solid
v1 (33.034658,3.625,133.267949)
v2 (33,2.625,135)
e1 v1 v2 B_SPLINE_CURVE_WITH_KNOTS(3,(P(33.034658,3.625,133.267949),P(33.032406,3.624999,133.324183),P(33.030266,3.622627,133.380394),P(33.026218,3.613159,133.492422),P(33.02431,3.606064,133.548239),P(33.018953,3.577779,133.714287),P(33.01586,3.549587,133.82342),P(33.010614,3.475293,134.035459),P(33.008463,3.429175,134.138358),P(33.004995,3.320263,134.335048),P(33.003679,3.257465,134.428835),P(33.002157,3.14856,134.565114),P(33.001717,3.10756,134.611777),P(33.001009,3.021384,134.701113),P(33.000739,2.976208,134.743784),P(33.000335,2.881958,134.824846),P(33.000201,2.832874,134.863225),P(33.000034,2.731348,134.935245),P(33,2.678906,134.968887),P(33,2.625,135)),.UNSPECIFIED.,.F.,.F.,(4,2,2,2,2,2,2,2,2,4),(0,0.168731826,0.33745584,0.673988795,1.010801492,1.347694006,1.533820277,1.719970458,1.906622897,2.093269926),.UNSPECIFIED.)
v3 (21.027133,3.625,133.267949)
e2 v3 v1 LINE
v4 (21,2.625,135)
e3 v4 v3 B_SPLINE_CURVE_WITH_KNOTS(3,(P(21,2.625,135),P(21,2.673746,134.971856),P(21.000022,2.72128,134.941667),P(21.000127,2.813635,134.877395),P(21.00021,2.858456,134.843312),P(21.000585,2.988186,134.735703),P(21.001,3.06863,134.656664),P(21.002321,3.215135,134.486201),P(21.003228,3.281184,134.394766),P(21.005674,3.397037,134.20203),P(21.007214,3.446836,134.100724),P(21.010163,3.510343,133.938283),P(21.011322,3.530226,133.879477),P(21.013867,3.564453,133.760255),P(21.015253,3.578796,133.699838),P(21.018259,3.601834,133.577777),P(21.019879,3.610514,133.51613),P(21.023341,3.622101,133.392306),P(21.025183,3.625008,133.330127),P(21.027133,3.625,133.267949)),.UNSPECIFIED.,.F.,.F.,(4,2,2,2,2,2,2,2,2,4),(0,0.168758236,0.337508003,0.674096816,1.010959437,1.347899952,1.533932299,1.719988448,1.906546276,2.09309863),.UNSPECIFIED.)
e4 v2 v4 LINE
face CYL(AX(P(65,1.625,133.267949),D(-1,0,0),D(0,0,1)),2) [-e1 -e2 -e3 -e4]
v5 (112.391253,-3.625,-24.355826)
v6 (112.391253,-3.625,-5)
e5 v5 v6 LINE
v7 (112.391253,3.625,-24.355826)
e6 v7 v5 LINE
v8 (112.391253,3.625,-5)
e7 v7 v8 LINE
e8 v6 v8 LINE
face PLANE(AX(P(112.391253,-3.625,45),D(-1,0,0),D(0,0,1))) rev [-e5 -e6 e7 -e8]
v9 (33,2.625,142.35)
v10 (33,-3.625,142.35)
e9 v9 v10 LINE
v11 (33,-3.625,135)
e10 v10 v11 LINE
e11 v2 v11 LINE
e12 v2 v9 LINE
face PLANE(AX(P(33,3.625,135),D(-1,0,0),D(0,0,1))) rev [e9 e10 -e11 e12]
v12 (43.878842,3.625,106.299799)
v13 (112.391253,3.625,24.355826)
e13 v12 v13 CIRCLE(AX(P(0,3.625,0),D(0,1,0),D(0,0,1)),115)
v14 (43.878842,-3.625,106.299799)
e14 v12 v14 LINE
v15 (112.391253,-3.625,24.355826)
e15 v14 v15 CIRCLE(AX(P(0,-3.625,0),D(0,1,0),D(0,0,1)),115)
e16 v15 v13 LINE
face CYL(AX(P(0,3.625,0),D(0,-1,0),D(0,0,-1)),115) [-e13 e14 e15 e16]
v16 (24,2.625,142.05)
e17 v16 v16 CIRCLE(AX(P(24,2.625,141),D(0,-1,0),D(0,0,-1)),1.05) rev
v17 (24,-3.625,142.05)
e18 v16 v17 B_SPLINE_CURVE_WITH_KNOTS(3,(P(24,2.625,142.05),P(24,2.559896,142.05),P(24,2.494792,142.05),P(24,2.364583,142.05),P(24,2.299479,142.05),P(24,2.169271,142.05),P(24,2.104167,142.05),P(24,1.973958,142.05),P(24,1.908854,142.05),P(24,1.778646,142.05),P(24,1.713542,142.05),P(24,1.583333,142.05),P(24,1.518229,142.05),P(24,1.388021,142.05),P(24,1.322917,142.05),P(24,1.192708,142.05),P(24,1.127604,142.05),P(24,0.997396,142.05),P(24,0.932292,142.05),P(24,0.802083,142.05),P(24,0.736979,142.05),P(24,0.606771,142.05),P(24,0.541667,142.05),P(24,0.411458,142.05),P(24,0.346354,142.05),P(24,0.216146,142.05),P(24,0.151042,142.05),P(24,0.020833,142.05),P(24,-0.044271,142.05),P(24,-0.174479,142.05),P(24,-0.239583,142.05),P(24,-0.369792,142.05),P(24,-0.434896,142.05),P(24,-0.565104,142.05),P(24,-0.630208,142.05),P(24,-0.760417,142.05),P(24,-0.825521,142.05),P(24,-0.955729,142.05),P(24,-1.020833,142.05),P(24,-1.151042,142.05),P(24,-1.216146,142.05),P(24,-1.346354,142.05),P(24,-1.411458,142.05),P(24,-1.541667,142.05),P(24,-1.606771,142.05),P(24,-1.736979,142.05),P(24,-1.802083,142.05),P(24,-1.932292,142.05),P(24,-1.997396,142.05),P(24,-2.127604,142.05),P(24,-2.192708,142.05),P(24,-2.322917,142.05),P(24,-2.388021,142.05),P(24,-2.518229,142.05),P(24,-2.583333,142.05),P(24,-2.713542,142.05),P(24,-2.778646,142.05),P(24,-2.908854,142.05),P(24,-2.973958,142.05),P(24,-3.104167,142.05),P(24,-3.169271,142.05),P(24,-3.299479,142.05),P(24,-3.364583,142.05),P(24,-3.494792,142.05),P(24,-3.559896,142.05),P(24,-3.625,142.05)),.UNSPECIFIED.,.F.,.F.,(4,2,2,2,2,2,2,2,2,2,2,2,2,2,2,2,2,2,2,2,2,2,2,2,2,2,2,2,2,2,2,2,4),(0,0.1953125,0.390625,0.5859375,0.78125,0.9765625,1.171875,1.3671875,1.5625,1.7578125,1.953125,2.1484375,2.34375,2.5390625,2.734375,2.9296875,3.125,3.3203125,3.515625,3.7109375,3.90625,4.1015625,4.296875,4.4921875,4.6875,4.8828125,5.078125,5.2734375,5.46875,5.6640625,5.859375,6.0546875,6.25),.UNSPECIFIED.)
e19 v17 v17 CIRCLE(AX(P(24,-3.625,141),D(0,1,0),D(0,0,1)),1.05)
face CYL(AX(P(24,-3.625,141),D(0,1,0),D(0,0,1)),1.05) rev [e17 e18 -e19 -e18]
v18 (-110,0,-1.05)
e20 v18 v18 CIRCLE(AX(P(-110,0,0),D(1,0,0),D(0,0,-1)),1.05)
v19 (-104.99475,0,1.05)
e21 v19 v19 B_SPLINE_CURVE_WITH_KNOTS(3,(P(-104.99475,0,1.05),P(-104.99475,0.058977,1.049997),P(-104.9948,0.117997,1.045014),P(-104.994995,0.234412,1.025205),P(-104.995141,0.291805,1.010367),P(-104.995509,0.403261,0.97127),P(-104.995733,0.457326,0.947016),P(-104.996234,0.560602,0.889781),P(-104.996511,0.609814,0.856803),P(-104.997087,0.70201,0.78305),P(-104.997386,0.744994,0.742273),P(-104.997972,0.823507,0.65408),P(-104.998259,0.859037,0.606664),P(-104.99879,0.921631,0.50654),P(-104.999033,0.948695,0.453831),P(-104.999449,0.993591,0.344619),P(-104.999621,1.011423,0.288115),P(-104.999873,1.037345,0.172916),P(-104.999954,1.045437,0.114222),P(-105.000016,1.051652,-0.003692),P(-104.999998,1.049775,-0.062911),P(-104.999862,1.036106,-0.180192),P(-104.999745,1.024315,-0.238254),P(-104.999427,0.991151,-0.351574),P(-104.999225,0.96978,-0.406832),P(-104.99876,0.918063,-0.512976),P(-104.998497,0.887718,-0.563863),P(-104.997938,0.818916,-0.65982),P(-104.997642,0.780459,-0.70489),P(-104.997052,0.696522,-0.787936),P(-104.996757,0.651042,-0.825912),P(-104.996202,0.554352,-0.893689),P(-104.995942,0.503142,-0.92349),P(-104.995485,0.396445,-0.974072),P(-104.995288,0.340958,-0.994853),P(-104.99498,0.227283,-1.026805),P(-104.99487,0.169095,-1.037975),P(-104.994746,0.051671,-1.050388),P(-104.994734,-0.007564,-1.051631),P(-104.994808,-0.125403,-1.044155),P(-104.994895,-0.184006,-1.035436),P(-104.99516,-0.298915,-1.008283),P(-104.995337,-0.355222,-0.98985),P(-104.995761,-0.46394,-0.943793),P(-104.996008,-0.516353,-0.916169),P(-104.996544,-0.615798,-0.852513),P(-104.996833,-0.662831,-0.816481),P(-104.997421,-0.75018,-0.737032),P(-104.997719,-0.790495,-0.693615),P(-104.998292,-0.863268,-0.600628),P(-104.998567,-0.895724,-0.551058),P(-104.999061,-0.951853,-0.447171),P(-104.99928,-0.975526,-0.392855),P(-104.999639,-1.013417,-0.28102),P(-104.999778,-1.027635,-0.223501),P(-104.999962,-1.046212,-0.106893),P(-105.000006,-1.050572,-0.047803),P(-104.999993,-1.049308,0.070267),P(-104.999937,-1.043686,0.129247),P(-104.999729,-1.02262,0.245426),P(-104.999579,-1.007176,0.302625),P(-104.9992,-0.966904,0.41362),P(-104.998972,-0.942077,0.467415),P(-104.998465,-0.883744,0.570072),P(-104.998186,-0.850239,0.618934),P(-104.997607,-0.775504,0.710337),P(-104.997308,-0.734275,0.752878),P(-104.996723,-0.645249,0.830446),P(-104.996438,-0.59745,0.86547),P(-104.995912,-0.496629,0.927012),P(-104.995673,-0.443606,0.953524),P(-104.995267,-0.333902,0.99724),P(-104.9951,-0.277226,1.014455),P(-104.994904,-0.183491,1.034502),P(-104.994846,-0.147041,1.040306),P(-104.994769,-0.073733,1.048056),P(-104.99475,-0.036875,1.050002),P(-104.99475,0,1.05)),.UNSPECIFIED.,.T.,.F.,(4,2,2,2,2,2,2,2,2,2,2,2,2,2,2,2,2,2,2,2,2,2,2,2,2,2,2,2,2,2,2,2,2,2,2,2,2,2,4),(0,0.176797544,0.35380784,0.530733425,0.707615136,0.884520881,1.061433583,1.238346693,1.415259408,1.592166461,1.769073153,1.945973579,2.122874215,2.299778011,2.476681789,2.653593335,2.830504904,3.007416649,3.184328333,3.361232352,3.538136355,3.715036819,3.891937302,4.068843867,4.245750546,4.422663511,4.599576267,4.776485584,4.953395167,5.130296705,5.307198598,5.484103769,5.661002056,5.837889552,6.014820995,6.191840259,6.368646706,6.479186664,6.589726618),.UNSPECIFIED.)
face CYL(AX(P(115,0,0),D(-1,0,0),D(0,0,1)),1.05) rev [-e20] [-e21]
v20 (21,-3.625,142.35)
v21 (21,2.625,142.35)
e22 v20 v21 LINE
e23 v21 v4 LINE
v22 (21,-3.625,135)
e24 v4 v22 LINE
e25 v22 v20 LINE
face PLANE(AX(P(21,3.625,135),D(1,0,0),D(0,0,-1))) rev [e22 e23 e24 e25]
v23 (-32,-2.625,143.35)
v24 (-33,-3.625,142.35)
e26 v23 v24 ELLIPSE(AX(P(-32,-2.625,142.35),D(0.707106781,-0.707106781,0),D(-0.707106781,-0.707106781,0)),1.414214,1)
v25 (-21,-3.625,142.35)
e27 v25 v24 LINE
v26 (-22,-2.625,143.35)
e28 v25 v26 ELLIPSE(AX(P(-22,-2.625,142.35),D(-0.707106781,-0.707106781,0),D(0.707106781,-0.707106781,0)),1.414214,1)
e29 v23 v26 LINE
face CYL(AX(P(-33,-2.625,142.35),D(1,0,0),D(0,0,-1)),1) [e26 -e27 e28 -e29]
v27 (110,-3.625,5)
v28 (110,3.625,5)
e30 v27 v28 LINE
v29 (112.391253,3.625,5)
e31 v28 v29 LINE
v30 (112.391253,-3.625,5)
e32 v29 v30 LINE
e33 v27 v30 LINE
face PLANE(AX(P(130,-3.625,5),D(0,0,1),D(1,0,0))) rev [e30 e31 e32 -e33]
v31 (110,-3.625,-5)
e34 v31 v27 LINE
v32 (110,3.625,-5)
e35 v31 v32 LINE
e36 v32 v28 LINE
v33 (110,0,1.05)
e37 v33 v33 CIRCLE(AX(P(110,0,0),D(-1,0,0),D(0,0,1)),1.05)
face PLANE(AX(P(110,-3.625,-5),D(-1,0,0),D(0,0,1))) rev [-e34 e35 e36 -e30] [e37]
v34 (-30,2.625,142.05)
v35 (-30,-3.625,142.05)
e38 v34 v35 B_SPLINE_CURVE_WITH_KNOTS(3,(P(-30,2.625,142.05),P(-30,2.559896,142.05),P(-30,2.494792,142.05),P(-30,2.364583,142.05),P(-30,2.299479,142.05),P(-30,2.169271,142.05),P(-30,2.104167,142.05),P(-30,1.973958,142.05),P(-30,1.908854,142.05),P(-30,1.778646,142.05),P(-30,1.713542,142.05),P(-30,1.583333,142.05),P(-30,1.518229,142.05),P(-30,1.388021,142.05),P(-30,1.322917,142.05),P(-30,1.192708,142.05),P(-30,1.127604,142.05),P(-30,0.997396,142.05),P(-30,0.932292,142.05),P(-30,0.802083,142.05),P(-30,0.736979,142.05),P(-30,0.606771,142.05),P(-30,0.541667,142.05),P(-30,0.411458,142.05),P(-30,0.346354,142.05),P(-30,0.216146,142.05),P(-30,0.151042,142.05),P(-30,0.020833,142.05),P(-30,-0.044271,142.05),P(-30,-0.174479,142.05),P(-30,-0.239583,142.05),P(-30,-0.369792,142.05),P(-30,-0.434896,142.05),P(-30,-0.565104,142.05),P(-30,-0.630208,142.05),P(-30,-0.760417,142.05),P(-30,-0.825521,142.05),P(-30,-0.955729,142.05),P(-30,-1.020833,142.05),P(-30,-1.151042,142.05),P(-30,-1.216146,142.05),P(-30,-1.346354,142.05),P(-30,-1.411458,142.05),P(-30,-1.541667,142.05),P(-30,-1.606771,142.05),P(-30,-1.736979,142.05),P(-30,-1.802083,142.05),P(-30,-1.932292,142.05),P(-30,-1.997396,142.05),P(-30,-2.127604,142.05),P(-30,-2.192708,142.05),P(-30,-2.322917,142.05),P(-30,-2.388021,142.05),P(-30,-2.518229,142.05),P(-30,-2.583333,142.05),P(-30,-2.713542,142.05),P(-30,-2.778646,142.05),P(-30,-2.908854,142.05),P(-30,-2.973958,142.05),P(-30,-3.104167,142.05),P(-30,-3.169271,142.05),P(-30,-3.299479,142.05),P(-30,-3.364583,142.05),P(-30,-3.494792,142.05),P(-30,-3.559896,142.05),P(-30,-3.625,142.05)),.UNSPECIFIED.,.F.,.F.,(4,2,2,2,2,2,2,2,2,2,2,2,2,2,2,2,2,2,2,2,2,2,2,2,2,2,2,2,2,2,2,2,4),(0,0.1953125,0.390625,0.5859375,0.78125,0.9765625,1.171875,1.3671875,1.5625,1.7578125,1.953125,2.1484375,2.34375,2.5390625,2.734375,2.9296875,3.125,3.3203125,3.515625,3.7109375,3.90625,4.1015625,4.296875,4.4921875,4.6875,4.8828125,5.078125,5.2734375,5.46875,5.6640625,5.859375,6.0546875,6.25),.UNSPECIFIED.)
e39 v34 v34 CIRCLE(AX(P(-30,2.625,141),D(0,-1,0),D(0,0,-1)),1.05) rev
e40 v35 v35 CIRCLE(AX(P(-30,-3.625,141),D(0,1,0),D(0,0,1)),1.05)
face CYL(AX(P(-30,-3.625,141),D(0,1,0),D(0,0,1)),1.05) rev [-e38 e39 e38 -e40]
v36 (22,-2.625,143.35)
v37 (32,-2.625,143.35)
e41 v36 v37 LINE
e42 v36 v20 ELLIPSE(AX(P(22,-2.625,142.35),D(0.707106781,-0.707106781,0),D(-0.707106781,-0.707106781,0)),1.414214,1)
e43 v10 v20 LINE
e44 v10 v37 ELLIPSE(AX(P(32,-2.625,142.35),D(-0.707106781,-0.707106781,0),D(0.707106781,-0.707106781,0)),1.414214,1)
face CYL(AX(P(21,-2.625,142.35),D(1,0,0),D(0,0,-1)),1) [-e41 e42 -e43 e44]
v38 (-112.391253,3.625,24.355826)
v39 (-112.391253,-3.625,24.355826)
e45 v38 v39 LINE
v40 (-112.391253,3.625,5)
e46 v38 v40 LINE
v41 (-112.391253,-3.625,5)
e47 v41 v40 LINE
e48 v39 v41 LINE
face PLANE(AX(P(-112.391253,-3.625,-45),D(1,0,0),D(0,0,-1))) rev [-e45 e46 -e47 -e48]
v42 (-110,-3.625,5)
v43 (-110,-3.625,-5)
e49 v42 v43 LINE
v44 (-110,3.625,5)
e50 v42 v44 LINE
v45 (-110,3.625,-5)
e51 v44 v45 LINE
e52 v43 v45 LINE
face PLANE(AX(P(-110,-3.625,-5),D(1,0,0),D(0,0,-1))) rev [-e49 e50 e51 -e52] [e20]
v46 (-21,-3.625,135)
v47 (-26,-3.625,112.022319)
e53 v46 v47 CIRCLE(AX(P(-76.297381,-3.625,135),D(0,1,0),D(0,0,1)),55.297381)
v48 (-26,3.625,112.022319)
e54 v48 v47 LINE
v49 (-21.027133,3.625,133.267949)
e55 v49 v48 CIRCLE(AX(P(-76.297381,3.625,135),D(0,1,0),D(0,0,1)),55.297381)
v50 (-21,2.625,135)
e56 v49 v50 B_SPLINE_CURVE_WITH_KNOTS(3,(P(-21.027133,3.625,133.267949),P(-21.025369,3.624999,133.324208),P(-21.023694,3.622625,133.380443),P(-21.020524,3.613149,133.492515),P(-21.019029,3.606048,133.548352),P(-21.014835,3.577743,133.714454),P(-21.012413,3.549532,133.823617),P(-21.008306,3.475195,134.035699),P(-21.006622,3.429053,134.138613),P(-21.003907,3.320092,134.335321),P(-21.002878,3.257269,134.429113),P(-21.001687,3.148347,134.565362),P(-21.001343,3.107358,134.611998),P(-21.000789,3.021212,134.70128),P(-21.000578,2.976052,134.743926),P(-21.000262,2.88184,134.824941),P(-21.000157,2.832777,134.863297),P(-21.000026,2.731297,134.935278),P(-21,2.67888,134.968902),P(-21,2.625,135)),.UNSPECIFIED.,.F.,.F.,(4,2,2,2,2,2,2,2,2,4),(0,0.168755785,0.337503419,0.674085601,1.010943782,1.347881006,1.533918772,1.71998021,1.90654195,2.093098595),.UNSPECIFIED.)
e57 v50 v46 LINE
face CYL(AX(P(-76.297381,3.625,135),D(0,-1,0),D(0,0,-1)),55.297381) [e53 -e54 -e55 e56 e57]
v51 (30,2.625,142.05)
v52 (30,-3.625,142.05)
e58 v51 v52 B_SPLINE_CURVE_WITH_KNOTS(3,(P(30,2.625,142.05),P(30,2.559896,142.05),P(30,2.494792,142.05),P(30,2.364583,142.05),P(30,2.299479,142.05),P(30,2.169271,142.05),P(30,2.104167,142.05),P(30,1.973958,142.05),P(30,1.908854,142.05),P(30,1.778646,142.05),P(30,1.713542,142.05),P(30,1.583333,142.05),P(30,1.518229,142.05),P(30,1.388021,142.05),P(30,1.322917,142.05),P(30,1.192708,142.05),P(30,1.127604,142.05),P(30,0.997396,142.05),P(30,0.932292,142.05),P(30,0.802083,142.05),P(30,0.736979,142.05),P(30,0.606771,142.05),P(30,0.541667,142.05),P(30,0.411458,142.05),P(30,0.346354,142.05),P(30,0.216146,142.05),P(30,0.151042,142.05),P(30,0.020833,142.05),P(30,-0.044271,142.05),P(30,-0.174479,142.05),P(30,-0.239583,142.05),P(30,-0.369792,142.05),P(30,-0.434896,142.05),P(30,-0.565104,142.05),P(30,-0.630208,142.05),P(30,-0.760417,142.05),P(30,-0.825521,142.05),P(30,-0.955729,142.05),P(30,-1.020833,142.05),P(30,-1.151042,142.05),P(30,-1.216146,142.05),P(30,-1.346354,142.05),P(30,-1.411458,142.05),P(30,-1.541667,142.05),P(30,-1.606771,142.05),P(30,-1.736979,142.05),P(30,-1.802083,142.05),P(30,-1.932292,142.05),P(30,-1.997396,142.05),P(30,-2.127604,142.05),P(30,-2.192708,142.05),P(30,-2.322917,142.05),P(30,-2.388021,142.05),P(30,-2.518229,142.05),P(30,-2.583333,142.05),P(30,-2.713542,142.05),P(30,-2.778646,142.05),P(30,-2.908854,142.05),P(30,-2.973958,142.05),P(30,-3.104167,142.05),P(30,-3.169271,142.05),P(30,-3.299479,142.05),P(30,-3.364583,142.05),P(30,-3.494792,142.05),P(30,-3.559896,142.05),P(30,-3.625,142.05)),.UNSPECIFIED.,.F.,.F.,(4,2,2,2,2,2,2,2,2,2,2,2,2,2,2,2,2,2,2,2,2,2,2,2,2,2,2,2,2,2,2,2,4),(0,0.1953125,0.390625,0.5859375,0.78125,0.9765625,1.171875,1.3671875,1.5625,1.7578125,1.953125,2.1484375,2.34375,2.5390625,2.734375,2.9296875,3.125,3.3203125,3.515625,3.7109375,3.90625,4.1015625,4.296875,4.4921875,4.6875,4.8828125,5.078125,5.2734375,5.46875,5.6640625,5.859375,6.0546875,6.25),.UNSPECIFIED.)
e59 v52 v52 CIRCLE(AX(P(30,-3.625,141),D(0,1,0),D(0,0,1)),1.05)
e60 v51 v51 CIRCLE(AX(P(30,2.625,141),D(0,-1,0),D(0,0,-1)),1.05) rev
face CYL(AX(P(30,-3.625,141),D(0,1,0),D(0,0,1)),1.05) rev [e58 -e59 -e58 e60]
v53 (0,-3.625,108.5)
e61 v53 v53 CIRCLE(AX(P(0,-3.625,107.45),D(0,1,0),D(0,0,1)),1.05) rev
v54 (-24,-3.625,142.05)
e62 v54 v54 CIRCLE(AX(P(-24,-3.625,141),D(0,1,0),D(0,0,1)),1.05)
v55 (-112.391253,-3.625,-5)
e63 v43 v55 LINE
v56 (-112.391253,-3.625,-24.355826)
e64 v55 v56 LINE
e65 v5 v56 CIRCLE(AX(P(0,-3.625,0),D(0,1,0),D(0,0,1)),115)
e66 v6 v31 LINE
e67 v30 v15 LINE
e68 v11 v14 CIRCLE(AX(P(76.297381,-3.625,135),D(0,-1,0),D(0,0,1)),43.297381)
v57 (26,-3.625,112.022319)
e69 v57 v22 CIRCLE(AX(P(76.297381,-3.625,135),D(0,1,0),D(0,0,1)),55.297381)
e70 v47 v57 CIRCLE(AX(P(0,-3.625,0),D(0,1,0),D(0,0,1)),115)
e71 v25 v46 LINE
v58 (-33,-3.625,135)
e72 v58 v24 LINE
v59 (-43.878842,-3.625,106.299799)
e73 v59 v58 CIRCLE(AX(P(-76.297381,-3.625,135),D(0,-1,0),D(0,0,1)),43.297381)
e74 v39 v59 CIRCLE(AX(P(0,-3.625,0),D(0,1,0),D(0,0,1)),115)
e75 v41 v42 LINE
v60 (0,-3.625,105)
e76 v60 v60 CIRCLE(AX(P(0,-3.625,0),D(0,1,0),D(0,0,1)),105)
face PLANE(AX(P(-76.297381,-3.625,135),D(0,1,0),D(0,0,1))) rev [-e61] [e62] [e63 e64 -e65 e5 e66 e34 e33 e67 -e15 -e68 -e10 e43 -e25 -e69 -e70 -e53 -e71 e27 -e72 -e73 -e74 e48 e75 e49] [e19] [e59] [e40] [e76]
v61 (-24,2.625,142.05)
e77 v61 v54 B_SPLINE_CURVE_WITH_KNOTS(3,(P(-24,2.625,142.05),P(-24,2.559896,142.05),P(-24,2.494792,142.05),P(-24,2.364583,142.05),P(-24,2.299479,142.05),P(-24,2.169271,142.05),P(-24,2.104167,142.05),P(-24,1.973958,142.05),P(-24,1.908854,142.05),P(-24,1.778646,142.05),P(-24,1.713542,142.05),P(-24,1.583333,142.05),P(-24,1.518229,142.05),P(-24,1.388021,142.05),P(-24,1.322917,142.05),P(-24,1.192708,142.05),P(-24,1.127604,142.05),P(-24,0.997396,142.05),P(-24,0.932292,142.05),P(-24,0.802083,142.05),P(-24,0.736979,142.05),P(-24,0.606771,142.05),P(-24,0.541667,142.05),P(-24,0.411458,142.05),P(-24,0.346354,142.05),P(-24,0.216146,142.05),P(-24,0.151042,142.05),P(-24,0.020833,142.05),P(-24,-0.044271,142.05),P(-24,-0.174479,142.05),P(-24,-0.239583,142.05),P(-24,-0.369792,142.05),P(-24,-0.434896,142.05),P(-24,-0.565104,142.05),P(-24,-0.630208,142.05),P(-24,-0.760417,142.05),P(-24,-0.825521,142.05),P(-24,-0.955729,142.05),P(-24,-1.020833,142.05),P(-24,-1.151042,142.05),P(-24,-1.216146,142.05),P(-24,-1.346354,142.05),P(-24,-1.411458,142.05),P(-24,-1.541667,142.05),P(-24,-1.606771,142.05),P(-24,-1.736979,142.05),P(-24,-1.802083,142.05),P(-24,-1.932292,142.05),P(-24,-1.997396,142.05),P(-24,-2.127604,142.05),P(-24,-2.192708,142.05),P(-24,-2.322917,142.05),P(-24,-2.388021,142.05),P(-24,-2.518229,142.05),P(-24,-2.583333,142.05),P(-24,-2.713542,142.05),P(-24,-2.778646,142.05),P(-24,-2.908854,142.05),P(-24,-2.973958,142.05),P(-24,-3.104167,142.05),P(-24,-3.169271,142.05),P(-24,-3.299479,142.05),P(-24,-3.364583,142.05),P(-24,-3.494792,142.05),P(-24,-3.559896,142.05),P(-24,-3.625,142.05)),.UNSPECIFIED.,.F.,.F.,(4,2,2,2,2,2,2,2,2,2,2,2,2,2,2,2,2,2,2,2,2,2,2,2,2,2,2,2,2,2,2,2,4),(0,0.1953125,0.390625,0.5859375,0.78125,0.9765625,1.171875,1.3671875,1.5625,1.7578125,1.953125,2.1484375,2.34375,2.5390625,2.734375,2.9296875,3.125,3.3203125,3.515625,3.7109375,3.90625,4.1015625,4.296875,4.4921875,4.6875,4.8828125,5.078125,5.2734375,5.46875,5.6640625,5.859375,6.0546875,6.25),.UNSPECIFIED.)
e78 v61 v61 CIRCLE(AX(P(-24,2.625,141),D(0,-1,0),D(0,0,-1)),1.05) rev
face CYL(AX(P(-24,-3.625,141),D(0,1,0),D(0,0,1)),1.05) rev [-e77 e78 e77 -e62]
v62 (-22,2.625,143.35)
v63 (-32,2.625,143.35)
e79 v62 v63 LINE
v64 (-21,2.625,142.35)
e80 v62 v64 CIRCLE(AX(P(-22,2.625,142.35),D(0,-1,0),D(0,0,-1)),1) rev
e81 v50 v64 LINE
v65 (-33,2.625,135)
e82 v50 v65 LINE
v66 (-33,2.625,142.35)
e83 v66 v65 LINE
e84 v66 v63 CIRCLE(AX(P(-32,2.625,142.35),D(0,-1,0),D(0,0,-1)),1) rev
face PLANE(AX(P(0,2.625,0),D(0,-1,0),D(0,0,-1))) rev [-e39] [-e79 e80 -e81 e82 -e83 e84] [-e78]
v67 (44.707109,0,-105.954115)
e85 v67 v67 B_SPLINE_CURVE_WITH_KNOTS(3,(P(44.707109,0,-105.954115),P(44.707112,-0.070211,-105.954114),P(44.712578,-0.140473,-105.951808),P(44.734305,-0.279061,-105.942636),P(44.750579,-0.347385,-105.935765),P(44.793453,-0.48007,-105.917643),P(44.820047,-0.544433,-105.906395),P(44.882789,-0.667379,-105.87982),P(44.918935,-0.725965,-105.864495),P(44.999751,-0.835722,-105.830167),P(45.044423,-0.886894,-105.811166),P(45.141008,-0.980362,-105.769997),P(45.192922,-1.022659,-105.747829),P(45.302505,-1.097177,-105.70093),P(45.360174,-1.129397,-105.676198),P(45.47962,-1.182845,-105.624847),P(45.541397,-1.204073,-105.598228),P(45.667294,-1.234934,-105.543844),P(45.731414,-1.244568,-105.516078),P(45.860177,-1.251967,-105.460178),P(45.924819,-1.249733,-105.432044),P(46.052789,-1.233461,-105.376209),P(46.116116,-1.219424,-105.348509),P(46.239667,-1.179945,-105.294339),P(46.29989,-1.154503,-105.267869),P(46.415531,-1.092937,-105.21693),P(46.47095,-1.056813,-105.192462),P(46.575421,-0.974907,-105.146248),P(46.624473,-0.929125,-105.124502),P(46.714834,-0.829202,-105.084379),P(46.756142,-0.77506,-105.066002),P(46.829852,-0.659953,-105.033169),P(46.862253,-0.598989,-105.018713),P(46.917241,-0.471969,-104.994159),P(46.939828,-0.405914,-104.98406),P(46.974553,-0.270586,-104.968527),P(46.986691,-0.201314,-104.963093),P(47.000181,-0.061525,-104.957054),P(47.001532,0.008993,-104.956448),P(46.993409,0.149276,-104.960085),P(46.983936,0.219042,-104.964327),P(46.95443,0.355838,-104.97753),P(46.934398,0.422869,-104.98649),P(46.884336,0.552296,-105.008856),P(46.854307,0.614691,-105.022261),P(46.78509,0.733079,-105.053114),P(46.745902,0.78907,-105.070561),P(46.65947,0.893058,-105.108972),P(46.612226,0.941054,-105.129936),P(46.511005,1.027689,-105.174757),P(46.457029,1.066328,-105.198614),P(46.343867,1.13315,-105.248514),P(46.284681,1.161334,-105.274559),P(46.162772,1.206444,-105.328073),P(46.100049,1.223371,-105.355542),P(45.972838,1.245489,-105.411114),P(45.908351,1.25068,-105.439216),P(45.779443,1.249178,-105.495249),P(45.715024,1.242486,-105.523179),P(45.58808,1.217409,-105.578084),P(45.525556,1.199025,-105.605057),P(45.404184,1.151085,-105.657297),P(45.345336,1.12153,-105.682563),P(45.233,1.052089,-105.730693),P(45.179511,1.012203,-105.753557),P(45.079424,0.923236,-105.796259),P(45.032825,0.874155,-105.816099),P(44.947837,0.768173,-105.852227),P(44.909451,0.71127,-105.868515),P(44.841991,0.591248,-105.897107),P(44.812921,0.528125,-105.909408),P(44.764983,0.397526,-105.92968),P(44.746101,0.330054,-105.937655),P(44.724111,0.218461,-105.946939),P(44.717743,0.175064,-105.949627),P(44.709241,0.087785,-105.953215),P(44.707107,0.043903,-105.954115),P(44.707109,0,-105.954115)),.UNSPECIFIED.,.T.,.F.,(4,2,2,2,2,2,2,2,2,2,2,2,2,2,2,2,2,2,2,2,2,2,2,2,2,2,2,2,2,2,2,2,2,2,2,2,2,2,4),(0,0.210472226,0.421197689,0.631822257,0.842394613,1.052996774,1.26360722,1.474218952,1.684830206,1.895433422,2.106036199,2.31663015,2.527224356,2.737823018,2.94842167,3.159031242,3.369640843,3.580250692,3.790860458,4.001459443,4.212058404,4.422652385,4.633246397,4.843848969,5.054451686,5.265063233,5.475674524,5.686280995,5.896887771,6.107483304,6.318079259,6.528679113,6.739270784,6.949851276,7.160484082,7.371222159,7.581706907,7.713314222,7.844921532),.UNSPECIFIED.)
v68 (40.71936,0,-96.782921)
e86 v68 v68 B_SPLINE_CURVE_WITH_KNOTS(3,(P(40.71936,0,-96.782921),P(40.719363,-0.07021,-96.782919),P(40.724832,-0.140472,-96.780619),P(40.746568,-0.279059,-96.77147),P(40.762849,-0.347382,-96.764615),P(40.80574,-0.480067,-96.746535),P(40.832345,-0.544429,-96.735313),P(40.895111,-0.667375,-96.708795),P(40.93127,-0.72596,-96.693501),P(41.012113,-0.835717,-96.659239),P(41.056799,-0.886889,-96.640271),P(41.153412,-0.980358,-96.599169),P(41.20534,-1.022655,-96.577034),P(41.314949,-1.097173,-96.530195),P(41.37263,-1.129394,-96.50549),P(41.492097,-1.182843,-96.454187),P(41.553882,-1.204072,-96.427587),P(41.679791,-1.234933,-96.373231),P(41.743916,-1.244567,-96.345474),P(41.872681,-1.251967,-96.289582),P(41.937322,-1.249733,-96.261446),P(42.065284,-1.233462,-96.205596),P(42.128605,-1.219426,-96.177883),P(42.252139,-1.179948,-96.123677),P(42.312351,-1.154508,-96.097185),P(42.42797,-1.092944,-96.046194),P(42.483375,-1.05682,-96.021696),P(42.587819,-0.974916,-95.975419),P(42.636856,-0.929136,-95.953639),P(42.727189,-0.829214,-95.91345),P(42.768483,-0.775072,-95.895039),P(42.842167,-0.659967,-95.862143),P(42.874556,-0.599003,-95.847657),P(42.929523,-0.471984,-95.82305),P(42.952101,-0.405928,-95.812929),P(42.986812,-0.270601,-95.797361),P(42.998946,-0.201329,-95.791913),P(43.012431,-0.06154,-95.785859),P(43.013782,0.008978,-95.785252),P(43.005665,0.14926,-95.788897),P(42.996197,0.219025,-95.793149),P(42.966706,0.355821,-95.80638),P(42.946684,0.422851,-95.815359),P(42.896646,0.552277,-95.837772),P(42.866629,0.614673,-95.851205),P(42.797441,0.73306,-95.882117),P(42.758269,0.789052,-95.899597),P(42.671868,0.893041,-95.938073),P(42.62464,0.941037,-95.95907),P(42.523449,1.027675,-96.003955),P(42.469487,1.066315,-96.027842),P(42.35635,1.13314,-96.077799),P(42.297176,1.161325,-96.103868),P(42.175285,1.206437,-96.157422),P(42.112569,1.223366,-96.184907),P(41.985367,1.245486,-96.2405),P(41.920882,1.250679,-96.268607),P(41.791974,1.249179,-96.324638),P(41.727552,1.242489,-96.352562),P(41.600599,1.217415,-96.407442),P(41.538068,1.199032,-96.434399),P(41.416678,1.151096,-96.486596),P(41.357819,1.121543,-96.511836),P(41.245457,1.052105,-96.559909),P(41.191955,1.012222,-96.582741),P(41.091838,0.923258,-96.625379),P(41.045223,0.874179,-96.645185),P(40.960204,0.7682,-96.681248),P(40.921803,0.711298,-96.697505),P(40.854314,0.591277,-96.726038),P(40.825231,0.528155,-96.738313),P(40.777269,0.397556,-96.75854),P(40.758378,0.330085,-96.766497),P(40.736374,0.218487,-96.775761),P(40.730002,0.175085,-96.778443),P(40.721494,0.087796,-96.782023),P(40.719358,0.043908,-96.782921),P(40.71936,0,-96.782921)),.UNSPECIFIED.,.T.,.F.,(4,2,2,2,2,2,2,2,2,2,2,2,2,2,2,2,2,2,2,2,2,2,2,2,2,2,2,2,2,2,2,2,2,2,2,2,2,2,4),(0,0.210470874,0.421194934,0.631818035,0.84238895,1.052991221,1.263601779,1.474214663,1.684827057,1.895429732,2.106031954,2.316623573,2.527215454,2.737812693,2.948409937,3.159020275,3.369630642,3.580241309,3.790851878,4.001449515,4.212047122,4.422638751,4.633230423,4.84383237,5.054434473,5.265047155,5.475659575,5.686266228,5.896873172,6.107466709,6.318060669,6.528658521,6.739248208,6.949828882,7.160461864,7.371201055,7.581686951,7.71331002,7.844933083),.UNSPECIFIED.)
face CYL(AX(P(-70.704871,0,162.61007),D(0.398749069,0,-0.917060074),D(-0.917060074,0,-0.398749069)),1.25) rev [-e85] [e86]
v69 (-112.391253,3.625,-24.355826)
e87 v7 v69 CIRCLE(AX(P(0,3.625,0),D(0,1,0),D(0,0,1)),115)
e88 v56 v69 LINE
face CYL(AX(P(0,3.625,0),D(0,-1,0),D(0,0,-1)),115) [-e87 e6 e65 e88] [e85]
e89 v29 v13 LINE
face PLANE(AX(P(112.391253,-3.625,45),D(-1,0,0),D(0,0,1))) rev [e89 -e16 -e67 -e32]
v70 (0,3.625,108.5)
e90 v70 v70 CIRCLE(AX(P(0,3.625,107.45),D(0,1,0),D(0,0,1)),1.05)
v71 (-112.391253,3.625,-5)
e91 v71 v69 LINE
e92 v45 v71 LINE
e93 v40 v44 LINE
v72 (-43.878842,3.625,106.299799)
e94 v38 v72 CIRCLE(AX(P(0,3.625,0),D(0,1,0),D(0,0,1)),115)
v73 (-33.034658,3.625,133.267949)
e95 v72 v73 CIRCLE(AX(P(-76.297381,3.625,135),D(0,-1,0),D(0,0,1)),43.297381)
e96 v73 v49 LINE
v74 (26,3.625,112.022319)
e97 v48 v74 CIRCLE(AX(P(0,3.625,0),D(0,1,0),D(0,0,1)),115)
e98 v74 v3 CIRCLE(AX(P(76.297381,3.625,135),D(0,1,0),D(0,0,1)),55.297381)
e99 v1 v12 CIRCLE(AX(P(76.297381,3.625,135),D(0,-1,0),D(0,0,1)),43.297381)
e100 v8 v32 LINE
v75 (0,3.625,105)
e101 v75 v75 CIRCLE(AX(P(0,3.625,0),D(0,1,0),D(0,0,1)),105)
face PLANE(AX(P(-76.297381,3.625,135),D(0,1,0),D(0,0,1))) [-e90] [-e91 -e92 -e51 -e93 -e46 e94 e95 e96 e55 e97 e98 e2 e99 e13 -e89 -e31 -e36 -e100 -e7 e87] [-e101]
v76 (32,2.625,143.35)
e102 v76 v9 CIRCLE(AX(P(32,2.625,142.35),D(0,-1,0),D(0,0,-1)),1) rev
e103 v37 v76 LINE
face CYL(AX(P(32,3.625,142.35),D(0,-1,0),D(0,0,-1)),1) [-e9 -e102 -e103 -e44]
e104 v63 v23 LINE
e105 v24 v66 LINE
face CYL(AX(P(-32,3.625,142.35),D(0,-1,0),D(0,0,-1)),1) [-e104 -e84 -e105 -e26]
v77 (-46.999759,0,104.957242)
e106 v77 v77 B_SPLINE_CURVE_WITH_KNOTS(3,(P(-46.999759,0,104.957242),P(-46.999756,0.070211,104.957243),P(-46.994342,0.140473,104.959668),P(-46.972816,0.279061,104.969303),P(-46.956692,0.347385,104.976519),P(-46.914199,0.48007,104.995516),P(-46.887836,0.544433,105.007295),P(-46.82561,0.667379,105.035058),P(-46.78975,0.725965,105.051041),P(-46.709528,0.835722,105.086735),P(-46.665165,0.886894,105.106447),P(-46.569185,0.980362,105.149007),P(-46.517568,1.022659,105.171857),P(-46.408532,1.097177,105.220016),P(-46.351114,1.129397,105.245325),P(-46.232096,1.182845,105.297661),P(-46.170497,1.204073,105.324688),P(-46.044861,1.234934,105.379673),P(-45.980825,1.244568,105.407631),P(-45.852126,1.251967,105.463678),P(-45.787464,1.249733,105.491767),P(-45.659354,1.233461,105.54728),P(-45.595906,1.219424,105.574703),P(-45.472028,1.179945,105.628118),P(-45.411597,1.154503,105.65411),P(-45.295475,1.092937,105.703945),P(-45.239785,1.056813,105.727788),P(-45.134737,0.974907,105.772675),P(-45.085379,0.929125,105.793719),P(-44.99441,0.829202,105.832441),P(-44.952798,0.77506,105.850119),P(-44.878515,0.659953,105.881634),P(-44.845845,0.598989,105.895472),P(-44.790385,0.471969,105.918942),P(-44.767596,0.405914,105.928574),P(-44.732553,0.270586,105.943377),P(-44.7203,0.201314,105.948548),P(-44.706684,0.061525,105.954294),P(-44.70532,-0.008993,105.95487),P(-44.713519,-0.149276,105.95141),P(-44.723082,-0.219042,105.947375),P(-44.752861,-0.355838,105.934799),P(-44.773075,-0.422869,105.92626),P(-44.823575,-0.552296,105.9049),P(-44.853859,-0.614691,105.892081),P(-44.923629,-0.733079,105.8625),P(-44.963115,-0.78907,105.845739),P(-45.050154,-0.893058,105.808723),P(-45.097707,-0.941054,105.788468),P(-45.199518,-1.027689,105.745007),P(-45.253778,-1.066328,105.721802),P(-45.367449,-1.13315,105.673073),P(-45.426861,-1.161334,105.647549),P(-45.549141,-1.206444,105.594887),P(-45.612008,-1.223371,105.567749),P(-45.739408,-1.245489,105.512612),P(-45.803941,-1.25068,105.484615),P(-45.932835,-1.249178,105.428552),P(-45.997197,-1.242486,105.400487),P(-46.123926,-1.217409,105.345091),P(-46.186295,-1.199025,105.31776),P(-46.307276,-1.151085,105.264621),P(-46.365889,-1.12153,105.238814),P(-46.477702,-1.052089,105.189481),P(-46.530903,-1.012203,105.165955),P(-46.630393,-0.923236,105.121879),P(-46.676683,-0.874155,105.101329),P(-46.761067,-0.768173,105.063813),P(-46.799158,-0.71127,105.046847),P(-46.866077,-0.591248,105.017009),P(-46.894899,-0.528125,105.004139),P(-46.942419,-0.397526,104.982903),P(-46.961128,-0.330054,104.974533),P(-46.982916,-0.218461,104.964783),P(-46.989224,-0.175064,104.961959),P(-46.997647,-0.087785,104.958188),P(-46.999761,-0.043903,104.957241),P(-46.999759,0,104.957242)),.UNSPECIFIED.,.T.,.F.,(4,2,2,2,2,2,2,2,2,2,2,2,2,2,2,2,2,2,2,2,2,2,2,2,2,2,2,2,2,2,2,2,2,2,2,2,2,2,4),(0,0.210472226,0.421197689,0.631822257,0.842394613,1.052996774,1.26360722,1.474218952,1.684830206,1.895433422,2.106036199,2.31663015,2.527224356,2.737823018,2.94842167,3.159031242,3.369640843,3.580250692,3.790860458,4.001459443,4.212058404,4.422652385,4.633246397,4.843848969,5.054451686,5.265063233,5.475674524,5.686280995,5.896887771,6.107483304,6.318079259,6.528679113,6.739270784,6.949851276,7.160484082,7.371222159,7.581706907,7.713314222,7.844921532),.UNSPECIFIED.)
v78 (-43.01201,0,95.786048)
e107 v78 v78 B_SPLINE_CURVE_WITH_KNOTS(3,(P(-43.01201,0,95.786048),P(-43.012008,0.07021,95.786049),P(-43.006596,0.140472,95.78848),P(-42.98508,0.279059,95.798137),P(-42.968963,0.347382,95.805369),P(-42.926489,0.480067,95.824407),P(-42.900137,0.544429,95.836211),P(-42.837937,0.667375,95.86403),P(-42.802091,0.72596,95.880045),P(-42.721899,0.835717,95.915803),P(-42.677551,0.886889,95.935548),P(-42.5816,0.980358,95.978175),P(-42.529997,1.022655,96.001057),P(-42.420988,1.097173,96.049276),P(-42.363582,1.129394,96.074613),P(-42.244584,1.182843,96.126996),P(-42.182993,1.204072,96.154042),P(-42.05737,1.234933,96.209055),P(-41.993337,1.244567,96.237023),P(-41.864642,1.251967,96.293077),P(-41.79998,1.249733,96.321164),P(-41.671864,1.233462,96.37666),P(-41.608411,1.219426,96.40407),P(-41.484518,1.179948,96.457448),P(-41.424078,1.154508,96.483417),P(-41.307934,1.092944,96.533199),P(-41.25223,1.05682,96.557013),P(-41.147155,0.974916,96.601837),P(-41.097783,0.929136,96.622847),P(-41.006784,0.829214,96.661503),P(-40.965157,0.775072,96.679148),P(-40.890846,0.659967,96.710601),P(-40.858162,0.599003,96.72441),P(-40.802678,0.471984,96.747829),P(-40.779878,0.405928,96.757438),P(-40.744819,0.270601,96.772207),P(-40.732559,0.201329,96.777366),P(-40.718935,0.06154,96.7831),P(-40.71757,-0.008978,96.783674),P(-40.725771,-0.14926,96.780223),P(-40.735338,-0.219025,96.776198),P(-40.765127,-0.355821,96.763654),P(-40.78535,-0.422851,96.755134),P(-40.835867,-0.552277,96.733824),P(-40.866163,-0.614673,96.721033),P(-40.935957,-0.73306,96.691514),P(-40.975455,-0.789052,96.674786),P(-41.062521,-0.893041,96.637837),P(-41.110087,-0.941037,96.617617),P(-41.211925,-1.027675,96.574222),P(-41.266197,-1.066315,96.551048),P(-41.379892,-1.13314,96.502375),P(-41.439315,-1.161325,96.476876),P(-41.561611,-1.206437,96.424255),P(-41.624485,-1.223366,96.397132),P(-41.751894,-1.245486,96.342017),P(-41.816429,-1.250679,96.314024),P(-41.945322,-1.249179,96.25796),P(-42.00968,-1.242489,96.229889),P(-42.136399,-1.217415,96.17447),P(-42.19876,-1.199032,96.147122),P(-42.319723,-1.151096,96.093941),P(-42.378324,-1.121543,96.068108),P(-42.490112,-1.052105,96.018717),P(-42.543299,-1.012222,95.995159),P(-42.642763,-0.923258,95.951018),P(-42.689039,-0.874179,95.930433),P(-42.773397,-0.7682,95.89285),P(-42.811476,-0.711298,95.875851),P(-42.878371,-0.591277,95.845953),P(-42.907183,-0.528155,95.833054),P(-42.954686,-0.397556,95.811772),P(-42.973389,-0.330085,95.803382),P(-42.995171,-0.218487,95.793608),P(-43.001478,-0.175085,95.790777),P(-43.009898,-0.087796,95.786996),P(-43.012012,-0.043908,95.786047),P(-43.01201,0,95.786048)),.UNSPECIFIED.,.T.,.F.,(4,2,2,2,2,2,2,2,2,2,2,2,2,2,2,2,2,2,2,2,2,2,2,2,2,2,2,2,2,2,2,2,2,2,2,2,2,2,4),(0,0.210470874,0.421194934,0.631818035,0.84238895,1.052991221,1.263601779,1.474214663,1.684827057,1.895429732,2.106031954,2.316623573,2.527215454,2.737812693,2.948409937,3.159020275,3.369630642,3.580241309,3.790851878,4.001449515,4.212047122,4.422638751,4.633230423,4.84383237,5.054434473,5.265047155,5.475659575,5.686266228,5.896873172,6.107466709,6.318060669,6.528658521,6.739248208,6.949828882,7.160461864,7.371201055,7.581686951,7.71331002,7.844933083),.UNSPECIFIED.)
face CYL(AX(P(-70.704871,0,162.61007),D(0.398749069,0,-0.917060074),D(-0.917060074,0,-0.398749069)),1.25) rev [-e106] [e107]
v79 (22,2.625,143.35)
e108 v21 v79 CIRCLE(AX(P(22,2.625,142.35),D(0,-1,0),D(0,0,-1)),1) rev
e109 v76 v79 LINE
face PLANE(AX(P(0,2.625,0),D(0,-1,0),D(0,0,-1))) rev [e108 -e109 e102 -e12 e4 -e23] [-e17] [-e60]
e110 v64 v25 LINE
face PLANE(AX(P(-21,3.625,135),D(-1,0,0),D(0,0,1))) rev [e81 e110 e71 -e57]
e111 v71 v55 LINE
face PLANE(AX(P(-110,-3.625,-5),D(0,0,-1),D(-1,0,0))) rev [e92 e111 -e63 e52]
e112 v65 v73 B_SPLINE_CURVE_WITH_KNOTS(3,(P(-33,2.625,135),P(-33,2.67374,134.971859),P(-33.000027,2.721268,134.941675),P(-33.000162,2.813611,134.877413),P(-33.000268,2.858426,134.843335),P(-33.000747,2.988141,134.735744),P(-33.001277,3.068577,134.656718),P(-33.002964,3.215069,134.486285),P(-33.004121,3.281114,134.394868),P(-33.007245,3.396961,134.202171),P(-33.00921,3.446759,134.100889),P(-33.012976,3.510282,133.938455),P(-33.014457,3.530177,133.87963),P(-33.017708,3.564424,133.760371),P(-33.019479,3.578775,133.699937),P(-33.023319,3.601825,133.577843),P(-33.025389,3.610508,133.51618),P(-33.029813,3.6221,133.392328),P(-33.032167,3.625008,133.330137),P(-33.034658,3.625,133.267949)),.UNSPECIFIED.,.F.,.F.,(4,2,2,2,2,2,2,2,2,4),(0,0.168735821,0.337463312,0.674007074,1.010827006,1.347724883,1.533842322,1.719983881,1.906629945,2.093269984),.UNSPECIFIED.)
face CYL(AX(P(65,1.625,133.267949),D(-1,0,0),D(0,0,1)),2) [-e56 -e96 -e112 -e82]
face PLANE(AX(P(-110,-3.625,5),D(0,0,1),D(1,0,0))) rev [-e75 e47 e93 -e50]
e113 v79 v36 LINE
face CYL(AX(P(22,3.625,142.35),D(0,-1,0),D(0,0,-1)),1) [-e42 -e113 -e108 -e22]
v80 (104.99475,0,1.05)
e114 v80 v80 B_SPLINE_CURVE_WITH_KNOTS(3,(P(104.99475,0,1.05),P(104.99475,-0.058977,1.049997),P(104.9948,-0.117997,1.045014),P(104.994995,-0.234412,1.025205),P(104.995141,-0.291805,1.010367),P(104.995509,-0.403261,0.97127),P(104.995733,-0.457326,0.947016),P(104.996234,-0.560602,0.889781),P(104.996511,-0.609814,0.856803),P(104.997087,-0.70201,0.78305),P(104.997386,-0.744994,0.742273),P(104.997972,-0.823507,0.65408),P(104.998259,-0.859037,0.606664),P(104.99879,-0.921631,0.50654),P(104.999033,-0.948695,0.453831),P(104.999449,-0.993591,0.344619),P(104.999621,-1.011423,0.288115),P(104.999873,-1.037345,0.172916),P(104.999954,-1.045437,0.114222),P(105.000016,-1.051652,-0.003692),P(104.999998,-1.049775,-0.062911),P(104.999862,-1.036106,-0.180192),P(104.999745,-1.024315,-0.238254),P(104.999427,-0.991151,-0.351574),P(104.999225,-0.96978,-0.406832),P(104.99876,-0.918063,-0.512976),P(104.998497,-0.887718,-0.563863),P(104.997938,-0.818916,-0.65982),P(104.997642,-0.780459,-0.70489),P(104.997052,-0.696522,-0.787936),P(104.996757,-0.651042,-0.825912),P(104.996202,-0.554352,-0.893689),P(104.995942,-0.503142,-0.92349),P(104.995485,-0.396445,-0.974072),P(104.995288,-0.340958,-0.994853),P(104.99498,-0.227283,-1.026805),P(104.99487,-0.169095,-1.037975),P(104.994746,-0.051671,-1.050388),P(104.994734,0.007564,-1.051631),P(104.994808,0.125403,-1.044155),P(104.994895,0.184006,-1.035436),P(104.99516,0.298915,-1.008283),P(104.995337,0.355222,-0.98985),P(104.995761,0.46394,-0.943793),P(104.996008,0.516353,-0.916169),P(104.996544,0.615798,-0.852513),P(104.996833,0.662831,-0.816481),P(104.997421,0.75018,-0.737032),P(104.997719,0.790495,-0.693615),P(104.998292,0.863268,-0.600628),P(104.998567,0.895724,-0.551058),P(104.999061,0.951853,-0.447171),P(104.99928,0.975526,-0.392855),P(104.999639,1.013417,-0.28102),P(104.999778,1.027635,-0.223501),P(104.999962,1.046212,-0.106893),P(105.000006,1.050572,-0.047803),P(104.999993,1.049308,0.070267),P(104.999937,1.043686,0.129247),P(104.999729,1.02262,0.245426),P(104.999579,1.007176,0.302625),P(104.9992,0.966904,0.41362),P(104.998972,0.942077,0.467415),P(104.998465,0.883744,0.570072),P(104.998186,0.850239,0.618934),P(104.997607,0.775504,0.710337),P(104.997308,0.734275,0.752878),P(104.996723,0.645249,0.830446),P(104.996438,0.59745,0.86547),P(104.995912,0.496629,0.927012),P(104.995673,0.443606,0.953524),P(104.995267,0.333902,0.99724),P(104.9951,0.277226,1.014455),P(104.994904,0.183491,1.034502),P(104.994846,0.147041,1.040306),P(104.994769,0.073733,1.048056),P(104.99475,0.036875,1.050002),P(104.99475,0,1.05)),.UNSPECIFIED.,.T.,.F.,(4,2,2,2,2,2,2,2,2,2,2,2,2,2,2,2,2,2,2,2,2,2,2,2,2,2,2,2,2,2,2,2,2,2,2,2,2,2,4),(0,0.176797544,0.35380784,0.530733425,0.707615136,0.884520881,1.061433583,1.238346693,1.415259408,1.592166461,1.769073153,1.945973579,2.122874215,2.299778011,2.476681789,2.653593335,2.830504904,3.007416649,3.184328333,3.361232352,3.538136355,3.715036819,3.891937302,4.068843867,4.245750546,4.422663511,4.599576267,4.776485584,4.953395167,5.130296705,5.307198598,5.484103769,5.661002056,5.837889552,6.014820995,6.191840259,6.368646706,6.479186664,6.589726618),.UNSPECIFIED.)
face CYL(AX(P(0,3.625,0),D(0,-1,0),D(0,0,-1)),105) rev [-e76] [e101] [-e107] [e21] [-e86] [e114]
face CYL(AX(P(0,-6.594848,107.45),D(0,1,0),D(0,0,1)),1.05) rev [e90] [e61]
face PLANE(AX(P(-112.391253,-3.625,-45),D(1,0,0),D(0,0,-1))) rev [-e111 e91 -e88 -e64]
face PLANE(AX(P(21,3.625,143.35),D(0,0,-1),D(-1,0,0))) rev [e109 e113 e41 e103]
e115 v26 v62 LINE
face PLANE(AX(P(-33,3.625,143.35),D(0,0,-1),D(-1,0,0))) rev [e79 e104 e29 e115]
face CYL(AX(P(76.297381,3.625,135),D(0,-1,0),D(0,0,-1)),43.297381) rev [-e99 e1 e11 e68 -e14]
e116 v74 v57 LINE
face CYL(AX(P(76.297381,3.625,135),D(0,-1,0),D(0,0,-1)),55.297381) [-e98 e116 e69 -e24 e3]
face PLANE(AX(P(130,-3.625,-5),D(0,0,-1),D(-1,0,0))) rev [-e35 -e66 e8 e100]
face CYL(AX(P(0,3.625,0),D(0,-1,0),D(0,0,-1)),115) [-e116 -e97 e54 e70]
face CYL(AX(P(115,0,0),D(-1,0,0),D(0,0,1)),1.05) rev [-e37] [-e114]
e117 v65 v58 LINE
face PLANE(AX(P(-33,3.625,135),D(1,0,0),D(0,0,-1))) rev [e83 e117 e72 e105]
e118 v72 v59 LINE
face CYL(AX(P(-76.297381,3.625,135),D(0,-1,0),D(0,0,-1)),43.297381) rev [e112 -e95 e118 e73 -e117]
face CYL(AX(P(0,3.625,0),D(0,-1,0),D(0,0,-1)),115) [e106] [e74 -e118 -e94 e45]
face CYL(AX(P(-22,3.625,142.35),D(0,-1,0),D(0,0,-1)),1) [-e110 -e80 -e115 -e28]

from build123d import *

# Parameters (mm, degrees)
SKETCH2_R               = 105
BOSS_EXTRUDE1_DEPTH     = 3.625
CUT_EXTRUDE1_DEPTH      = 184.813392126
CUT_EXTRUDE1_DEPTH_BACK = 184.813392126
SKETCH4_R               = 1.25
SKETCH7_R               = 1.05
CUT_EXTRUDE2_DEPTH      = 184.920594346
CUT_EXTRUDE3_DEPTH      = 184.813392191
CUT_EXTRUDE3_DEPTH_BACK = 184.813392191
SKETCH9_R               = 1.05
CUT_EXTRUDE4_DEPTH      = 184.813392192
CUT_EXTRUDE4_DEPTH_BACK = 184.813392192
SKETCH10_W              = 20
SKETCH10_H              = 10
CUT_EXTRUDE5_DEPTH      = 184.745375857
CUT_EXTRUDE5_DEPTH_BACK = 184.745375857
SKETCH11_W              = 30
SKETCH11_H              = 90
SKETCH12_R              = 1.05
CUT_EXTRUDE6_DEPTH      = 7.25
FILLET1_R               = 1
SKETCH13_W              = 130
SKETCH13_H              = 10
CUT_EXTRUDE7_DEPTH      = 1
FILLET2_R               = 2


with BuildPart() as part:
    # Sketch2 → Boss-Extrude1 (new, symmetric)
    with BuildSketch(Plane(origin=(0, 0, 0), x_dir=(1, 0, 0), z_dir=(0, 1, 0))):
        with BuildLine():
            Line((-33, -135), (-33, -143.35))
            Line((-33, -143.35), (-21, -143.35))
            Line((-21, -143.35), (-21, -135))
            ThreePointArc((-21, -135), (-22.264456843, -123.242302365), (-26, -112.022319205))
            ThreePointArc((-26, -112.022319205), (0, -115), (26, -112.022319205))
            ThreePointArc((26, -112.022319205), (22.264456843, -123.242302365), (21, -135))
            Line((21, -135), (21, -143.35))
            Line((21, -143.35), (33, -143.35))
            Line((33, -143.35), (33, -135))
            ThreePointArc((33, -135), (35.810957179, -119.65357728), (43.878842197, -106.299798718))
            ThreePointArc((43.878842197, -106.299798718), (0, 115), (-43.878842197, -106.299798718))
            ThreePointArc((-43.878842197, -106.299798718), (-35.810957179, -119.65357728), (-33, -135))
        make_face()
        with Locations(Location((0, 0, 0), (0, 0, 90))):
            Circle(SKETCH2_R, mode=Mode.SUBTRACT)
    extrude(amount=BOSS_EXTRUDE1_DEPTH, both=True)

    # Sketch4 → Cut-Extrude1 (cut, two sides: drawn at the far end of the back side and taken through both)
    with BuildSketch(Plane(origin=(0, 0, 0), x_dir=(0, 1, 0), z_dir=(0.39874906892524387, 0, -0.9170600743851252)).offset(-CUT_EXTRUDE1_DEPTH_BACK)):
        with Locations(Location((0, 0, 0), (0, 0, 270))):
            Circle(SKETCH4_R)
    extrude(amount=CUT_EXTRUDE1_DEPTH + CUT_EXTRUDE1_DEPTH_BACK, mode=Mode.SUBTRACT)

    # Sketch7 → Cut-Extrude2 (cut, through all)
    with BuildSketch(Plane(origin=(0, 3.625, 0), x_dir=(1, 0, 0), z_dir=(0, 1, 0))):
        with Locations(Location((-30, -141, 0), (0, 0, 270))):
            Circle(SKETCH7_R)
        with Locations(Location((-24, -141, 0), (0, 0, 270))):
            Circle(SKETCH7_R)
        with Locations(Location((24, -141, 0), (0, 0, 270))):
            Circle(SKETCH7_R)
        with Locations(Location((30, -141, 0), (0, 0, 270))):
            Circle(SKETCH7_R)
    extrude(amount=-CUT_EXTRUDE2_DEPTH, mode=Mode.SUBTRACT)

    # Sketch9 → Cut-Extrude3 (cut, two sides: drawn at the far end of the back side and taken through both)
    with BuildSketch(Plane(origin=(0, 0, 0), x_dir=(0, 0, -1), z_dir=(1, 0, 0)).offset(-CUT_EXTRUDE3_DEPTH_BACK)):
        with Locations(Location((0, 0, 0), (0, 0, 180))):
            Circle(SKETCH9_R)
    extrude(amount=CUT_EXTRUDE3_DEPTH + CUT_EXTRUDE3_DEPTH_BACK, mode=Mode.SUBTRACT)

    # Sketch10 → Cut-Extrude4 (cut, two sides: drawn at the far end of the back side and taken through both)
    with BuildSketch(Plane(origin=(0, 0, 0), x_dir=(1, 0, 0), z_dir=(0, 1, 0)).offset(-CUT_EXTRUDE4_DEPTH_BACK)):
        with Locations((-120, 0)):
            Rectangle(SKETCH10_W, SKETCH10_H)
        with Locations((120, 0)):
            Rectangle(SKETCH10_W, SKETCH10_H)
    extrude(amount=CUT_EXTRUDE4_DEPTH + CUT_EXTRUDE4_DEPTH_BACK, mode=Mode.SUBTRACT)

    # Sketch11 → Cut-Extrude5 (cut, two sides: drawn at the far end of the back side and taken through both)
    with BuildSketch(Plane(origin=(0, 0, 0), x_dir=(1, 0, 0), z_dir=(0, 1, 0)).offset(-CUT_EXTRUDE5_DEPTH_BACK)):
        with Locations((-127.391252931, 0)):
            Rectangle(SKETCH11_W, SKETCH11_H)
        with Locations((127.391252931, 0)):
            Rectangle(SKETCH11_W, SKETCH11_H)
    extrude(amount=CUT_EXTRUDE5_DEPTH + CUT_EXTRUDE5_DEPTH_BACK, mode=Mode.SUBTRACT)

    # Sketch12 → Cut-Extrude6 (cut)
    with BuildSketch(Plane(origin=(0, 3.625, 0), x_dir=(1, 0, 0), z_dir=(0, 1, 0))):
        with Locations(Location((0, -107.45, 0), (0, 0, 270))):
            Circle(SKETCH12_R)
    extrude(amount=-CUT_EXTRUDE6_DEPTH, mode=Mode.SUBTRACT)

    # Fillet1
    fillet1_edges = [part.edges().sort_by_distance(p)[0] for p in [
        (-27, -3.625, 143.35),
        (27, -3.625, 143.35),
        (-21, 0, 143.35),
        (-33, 0, 143.35),
        (27, 3.625, 143.35),
        (33, 0, 143.35),
        (21, 0, 143.35),
        (-27, 3.625, 143.35),
    ]]
    fillet(fillet1_edges, radius=FILLET1_R)

    # Sketch13 → Cut-Extrude7 (cut)
    with BuildSketch(Plane(origin=(0, 3.625, 0), x_dir=(1, 0, 0), z_dir=(0, 1, 0))):
        with Locations((0, -140)):
            Rectangle(SKETCH13_W, SKETCH13_H)
    extrude(amount=-CUT_EXTRUDE7_DEPTH, mode=Mode.SUBTRACT)

    # Fillet2
    # the kernel refuses this fillet: 2 mm, written as the material it takes off along each edge
    with BuildSketch(Plane(origin=(37.330127019, 3.625, 135), x_dir=(0, 0, -1), z_dir=(-1, 0, 0))) as fillet2_piece_1:
        with BuildLine():
            CenterArc((1.732050808, 2), FILLET2_R, 210, 60)
            Line((0, 1), (-0.034641016, 0.98))
            ThreePointArc((-0.034641016, 0.98), (-0.04, 0.5), (-0.04, 0))
            Line((-0.04, 0), (0, -0.04))
            Line((0, -0.04), (1.732050808, -0.04))
            Line((1.732050808, -0.04), (1.732050808, 0))
        make_face()
    extrude(amount=20.660254038, mode=Mode.SUBTRACT)
    with BuildSketch(Plane(origin=(-16.669872981, 3.625, 135), x_dir=(0, -1, 0), z_dir=(-1, 0, 0))) as fillet2_piece_2:
        with BuildLine():
            CenterArc((2, -1.732050808), FILLET2_R, 120, 60)
            Line((0, -1.732050808), (-0.04, -1.732050808))
            Line((-0.04, -1.732050808), (-0.04, 0))
            Line((-0.04, 0), (0, 0.04))
            ThreePointArc((0, 0.04), (0.5, 0.04), (0.98, 0.034641016))
            Line((0.98, 0.034641016), (1, 0))
        make_face()
    extrude(amount=20.660254038, mode=Mode.SUBTRACT)


solid = part.part
